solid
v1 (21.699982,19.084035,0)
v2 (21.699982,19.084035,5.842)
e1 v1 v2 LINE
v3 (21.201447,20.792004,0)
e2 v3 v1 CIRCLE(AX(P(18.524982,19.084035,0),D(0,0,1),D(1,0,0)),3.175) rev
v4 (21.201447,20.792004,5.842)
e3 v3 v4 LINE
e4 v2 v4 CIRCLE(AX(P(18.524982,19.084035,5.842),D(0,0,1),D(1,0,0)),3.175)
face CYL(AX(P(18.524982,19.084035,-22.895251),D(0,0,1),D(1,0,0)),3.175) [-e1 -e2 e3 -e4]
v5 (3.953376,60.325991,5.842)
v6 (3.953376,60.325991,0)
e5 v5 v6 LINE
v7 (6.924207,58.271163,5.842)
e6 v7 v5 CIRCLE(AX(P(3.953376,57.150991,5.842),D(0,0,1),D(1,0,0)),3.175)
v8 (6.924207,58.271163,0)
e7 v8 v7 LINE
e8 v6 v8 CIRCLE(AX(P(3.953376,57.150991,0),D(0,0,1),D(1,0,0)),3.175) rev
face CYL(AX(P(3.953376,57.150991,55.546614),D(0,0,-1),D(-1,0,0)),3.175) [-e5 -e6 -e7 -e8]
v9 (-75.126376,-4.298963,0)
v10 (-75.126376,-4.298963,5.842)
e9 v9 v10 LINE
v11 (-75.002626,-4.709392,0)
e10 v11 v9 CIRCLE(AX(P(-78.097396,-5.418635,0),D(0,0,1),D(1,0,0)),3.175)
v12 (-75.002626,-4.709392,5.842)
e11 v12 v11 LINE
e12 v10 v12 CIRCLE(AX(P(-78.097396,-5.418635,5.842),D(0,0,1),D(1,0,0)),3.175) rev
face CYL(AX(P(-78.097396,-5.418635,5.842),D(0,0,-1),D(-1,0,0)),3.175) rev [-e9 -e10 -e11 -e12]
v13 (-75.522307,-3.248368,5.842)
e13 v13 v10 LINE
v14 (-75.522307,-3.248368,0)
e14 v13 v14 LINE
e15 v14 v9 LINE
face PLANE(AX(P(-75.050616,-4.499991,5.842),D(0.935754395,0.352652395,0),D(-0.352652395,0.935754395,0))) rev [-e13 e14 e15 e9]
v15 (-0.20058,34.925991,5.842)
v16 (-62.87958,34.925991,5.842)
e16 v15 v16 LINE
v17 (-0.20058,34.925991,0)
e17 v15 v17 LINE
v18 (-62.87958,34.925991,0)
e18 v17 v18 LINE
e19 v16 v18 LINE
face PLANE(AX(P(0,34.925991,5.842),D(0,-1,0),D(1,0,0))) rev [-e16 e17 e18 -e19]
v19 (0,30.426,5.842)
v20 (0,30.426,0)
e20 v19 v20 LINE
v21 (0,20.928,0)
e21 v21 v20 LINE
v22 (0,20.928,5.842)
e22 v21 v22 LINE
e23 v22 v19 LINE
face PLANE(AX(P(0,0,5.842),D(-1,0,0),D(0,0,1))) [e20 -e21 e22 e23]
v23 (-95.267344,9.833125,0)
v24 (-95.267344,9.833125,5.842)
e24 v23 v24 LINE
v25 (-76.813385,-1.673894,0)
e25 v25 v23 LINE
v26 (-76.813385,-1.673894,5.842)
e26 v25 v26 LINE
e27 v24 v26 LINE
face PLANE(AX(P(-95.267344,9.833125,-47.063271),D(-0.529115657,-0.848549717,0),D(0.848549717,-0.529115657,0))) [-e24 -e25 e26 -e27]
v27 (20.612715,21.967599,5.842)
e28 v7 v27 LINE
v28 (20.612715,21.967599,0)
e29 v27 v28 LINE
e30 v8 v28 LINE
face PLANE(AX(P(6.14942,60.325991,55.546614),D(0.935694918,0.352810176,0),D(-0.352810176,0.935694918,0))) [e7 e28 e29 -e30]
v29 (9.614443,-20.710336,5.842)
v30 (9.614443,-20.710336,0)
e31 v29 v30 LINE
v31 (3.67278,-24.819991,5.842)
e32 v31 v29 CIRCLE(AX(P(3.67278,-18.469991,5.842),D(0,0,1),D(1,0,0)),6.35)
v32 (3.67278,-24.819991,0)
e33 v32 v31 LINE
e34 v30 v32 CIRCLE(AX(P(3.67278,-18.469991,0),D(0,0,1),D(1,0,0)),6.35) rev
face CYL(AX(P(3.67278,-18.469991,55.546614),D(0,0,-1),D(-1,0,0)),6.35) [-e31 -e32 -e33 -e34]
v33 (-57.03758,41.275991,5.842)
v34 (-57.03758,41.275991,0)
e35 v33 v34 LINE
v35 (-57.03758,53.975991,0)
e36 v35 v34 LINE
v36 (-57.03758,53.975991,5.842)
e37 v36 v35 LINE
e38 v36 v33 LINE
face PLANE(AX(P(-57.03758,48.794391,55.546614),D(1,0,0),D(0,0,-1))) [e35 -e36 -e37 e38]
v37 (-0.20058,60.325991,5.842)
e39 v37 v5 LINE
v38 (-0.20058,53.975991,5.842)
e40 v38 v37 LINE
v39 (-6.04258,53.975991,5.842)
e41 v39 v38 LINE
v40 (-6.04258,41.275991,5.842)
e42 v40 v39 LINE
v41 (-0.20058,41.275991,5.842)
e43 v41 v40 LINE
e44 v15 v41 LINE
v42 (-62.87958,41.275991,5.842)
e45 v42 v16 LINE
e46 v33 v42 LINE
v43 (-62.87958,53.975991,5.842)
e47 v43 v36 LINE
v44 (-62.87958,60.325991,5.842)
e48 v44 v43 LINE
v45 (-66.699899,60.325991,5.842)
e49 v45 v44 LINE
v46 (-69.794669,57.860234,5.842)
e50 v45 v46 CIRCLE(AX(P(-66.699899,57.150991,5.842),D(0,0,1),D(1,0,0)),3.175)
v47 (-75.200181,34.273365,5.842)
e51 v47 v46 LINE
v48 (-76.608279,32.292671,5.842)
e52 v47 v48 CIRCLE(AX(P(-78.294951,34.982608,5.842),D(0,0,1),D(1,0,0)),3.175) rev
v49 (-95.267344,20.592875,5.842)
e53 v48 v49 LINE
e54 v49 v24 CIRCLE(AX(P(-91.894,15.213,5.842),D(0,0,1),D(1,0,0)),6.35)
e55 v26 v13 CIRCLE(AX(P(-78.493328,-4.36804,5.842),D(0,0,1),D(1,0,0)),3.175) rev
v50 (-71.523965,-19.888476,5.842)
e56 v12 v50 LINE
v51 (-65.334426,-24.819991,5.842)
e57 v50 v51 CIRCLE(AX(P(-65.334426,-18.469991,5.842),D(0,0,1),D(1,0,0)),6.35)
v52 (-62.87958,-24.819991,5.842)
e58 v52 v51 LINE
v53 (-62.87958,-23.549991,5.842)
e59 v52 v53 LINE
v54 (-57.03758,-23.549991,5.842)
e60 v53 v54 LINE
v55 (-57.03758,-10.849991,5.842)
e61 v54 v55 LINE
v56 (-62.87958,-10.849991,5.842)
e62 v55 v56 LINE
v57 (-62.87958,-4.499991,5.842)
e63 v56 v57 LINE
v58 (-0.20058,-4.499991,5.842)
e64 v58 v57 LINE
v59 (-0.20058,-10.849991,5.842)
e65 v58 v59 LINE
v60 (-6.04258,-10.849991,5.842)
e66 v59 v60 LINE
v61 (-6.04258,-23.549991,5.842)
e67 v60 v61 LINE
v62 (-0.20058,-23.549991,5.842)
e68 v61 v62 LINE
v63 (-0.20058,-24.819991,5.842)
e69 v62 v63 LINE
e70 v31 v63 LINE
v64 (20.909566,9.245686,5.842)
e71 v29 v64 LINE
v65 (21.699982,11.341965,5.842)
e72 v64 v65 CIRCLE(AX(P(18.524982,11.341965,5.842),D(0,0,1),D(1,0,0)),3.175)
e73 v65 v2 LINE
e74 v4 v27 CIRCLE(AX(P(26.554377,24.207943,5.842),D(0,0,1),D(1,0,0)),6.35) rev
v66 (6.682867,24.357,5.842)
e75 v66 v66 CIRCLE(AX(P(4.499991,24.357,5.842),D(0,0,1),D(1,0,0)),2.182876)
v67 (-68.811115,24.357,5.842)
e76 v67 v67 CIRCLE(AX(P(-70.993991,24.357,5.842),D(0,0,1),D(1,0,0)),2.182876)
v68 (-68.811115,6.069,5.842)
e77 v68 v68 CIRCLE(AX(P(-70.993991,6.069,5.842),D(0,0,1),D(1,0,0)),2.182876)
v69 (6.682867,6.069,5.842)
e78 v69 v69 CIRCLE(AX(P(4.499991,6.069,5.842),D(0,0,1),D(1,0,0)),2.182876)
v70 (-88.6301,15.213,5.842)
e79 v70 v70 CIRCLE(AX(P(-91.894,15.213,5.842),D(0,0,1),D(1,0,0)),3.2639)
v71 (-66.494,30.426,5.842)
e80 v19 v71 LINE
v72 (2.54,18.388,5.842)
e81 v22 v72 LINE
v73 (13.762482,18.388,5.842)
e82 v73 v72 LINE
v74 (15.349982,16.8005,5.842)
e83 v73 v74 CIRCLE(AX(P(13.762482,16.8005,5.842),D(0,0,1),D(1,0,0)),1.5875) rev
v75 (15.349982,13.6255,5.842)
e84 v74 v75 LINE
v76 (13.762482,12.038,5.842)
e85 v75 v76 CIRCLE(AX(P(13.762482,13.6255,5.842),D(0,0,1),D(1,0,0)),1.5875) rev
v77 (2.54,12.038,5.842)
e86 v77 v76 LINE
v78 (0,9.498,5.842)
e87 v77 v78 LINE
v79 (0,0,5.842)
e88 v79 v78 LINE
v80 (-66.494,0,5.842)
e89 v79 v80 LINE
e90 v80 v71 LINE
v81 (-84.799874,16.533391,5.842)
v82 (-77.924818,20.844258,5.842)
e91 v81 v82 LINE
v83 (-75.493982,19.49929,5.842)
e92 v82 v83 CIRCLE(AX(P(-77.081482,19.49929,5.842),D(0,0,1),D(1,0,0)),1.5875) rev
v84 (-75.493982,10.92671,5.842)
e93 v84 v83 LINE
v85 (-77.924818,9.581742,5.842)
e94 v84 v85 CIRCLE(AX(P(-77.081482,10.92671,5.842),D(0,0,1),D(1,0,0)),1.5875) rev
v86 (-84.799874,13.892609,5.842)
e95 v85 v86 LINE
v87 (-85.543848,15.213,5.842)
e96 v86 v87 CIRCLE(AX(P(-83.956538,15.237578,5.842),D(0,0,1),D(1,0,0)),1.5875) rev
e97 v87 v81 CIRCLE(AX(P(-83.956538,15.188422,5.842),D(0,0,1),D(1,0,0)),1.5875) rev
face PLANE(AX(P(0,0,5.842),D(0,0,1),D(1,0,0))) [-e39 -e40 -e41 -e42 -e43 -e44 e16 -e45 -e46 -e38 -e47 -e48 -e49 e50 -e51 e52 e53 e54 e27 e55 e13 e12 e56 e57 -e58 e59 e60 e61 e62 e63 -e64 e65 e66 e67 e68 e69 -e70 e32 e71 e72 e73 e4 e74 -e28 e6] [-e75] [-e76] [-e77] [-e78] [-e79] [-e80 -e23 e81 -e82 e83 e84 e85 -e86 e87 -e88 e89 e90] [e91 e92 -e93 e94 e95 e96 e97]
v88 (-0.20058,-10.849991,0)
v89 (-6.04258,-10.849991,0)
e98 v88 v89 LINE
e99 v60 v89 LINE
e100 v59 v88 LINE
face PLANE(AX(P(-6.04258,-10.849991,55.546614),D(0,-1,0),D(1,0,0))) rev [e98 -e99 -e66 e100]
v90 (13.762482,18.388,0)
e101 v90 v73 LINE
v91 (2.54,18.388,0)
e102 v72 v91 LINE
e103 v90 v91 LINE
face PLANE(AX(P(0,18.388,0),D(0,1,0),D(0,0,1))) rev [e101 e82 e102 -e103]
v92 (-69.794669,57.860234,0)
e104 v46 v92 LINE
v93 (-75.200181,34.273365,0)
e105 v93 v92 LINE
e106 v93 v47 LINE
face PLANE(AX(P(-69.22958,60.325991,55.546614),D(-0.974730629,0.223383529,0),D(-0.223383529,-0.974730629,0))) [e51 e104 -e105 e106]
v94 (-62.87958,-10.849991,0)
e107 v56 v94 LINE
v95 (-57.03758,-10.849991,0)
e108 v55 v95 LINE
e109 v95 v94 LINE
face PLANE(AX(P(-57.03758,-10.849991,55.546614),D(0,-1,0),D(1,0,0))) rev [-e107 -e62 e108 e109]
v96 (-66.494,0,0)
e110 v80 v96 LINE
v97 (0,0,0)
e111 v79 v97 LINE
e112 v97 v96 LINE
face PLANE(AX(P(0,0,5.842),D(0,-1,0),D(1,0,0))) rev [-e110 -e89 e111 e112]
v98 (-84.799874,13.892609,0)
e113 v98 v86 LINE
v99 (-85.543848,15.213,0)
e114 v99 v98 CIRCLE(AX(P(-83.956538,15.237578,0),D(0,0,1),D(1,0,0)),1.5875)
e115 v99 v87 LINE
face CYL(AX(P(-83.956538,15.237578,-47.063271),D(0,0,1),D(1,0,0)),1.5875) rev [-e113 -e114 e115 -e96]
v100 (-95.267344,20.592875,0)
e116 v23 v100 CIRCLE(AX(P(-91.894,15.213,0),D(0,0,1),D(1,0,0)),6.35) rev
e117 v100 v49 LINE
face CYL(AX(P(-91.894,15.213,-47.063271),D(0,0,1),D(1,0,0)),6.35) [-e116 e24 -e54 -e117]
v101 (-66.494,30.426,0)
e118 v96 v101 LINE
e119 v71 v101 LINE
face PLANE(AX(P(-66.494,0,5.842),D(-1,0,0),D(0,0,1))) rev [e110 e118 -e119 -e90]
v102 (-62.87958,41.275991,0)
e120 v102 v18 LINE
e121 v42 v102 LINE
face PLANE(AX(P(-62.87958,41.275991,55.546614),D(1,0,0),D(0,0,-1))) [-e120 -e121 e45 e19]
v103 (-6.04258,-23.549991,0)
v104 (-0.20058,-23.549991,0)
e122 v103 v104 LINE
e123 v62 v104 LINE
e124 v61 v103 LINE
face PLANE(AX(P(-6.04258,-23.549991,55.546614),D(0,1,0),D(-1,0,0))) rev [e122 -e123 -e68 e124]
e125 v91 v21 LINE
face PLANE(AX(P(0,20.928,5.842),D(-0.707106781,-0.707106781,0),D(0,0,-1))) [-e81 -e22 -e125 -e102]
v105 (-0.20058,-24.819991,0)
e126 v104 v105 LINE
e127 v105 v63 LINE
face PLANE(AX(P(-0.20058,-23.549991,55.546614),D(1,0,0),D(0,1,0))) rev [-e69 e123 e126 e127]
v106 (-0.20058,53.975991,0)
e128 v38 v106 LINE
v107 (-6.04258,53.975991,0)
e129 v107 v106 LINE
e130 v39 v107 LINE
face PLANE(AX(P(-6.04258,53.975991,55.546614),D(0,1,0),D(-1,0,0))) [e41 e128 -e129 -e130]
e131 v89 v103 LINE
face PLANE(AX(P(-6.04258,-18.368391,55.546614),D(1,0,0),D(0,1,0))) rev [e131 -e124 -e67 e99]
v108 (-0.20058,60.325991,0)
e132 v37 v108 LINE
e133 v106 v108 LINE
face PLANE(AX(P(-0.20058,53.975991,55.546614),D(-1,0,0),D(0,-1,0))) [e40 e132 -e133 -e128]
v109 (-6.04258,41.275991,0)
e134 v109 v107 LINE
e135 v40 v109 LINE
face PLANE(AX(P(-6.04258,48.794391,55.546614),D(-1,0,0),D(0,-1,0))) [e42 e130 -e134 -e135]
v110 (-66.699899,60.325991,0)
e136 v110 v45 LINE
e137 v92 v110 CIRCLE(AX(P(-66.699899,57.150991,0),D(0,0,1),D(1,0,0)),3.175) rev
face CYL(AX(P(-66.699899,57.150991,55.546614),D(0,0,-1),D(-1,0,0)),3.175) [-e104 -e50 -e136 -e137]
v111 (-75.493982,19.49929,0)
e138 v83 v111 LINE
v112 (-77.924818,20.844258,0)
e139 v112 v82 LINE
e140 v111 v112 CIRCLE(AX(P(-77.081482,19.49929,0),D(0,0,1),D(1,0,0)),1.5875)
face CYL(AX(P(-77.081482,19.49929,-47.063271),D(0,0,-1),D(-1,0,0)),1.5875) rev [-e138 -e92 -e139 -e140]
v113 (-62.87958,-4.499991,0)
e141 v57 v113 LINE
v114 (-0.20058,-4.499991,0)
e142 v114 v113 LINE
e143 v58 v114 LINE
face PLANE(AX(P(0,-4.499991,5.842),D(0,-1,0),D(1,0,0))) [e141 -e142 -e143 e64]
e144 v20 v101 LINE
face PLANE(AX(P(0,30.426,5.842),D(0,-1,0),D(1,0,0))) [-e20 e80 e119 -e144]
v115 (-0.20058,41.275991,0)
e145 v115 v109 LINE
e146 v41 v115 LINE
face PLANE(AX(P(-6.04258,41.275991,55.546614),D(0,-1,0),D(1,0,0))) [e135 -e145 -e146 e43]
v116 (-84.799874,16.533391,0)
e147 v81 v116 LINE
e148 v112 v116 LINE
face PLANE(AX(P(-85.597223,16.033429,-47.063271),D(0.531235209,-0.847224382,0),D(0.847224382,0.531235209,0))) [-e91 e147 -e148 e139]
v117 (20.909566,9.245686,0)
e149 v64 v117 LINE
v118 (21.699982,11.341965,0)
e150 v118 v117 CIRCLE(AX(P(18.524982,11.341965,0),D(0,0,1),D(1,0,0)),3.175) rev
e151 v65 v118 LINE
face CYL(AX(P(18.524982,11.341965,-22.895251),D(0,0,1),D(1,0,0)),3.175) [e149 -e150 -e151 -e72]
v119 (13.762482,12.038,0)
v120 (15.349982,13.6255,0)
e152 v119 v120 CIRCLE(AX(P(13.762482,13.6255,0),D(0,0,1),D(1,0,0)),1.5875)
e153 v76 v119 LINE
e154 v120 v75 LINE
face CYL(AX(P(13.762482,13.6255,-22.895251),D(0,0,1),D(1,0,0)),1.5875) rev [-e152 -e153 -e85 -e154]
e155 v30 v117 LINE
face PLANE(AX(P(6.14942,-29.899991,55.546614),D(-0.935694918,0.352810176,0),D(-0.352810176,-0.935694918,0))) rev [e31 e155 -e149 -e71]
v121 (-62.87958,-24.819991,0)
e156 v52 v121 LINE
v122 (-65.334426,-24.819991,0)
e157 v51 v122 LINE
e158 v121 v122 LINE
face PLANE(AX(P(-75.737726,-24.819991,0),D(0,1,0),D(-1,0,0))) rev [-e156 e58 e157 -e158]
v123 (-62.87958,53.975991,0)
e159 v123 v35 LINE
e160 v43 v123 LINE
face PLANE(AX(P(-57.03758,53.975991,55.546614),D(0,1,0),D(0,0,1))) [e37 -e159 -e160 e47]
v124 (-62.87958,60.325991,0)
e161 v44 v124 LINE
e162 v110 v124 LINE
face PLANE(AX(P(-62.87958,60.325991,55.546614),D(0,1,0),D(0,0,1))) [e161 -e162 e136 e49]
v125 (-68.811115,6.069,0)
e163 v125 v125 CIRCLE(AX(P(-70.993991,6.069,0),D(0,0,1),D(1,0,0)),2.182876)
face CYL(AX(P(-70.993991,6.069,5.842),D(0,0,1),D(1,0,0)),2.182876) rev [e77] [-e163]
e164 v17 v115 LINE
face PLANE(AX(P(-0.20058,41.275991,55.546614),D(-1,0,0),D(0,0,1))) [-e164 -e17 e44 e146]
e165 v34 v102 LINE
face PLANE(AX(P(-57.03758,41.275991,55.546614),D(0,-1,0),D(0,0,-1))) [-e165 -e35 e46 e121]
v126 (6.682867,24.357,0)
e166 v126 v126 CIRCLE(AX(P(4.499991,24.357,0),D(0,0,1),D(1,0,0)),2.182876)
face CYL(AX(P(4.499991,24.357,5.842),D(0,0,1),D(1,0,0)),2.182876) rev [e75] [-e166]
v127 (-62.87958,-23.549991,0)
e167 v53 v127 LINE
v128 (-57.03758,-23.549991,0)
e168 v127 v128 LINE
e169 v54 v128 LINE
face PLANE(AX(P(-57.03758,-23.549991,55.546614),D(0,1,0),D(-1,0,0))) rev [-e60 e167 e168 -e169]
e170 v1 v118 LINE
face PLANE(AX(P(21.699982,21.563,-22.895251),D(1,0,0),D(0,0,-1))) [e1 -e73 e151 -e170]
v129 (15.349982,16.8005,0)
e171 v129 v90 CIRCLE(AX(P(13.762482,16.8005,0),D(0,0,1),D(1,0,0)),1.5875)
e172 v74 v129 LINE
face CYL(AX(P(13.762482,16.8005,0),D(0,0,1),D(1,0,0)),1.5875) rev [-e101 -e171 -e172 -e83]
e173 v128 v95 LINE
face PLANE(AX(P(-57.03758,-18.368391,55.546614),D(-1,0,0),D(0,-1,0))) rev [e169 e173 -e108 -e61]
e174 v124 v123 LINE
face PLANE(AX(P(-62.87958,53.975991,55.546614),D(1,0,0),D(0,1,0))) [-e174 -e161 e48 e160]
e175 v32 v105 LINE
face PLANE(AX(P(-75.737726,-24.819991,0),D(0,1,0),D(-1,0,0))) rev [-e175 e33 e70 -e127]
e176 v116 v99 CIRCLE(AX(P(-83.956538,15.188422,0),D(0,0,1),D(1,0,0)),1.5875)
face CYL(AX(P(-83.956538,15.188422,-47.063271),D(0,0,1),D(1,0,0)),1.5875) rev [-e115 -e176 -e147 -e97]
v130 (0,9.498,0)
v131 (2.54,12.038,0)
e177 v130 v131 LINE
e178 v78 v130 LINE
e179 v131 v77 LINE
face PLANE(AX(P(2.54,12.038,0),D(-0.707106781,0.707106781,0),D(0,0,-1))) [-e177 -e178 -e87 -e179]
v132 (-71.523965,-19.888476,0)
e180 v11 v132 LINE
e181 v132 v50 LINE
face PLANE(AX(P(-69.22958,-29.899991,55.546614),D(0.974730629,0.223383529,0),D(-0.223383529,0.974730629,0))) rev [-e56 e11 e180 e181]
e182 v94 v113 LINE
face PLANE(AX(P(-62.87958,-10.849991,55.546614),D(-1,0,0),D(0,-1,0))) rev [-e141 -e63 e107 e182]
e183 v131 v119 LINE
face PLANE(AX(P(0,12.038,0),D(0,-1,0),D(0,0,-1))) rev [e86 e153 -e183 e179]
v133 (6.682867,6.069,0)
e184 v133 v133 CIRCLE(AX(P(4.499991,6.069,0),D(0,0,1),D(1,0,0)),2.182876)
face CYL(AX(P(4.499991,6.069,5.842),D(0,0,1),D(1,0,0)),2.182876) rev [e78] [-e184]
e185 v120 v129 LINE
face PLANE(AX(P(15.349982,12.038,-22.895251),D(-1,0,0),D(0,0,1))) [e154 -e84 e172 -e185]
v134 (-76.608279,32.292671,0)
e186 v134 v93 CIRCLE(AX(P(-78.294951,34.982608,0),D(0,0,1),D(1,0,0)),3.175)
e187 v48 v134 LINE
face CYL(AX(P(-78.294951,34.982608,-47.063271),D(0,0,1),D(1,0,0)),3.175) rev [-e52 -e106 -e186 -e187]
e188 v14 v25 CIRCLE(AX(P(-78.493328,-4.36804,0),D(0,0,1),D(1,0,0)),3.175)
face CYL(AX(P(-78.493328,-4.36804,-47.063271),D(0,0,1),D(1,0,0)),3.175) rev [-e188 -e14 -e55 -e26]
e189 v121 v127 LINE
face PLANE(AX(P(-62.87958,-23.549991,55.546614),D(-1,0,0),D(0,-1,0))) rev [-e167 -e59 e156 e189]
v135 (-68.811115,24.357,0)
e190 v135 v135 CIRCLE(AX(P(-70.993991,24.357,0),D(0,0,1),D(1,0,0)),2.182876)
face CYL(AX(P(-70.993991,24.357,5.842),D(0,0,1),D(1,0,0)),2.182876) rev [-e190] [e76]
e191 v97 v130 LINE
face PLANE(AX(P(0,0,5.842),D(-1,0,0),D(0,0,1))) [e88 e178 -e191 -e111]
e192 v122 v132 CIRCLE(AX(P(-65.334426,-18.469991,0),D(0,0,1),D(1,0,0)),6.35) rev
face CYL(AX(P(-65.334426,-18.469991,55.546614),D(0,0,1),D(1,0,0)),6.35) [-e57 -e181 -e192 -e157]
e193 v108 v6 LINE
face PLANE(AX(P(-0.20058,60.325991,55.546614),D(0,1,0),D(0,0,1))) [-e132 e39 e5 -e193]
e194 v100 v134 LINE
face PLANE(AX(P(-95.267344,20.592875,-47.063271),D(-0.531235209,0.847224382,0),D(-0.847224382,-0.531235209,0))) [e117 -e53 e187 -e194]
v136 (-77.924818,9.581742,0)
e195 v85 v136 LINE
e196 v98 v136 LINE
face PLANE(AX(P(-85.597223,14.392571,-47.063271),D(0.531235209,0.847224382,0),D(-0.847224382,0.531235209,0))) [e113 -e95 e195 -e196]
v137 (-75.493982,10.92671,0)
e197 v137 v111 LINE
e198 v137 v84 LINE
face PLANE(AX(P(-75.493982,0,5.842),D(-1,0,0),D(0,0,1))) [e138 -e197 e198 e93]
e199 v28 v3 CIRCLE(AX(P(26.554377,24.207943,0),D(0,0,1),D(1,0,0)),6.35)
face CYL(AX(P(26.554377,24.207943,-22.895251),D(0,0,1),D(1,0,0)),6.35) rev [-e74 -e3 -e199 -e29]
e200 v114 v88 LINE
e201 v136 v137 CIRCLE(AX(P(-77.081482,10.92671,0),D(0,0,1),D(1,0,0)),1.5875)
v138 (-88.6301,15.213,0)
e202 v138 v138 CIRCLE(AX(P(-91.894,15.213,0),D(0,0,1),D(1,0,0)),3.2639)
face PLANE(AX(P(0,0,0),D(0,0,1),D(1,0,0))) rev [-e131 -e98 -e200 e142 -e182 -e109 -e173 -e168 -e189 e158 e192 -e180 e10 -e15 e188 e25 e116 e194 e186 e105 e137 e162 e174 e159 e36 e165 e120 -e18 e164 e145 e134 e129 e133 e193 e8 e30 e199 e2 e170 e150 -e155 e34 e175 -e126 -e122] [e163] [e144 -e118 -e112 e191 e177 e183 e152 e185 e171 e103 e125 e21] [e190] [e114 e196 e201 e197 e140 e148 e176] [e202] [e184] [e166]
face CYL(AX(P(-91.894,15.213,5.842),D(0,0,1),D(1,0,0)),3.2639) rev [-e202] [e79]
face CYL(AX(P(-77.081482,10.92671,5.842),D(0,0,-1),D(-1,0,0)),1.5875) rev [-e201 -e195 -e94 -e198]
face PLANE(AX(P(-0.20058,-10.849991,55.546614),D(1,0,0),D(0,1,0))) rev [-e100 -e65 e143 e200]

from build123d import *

# Parameters (mm, degrees)
SKETCH1_W                        = 66.494000054
SKETCH1_H                        = 30.426
BOSS_EXTRUDE1_DEPTH              = 5.842
F_11_64_0_17188_DIAMETER_HOLE1_D = 4.365752
F_0_257_DIAMETER_HOLE1_D         = 6.5278
BOSS_EXTRUDE3_DEPTH              = 5.842
F_0_257_DIAMETER_HOLE3_D         = 6.5278
SKETCH13_W                       = 8.999982
SKETCH13_H                       = 6.35
CUT_EXTRUDE1_DEPTH               = 105.431017222
CHAMFER1_SIZE                    = 2.54
BOSS_EXTRUDE6_DEPTH              = 5.842
FILLET1_R                        = 3.175
FILLET2_R                        = 1.5875
FILLET3_R                        = 1.5875
BOSS_EXTRUDE7_DEPTH              = 5.842
FILLET4_R                        = 3.175
FILLET5_R                        = 6.35
FILLET6_R                        = 3.175
CUT_EXTRUDE3_DEPTH               = 116.434993398
CUT_EXTRUDE4_DEPTH               = 116.434993398
FILLET10_R                       = 3.175
SKETCH29_W                       = 87.204685613
SKETCH29_H                       = 5.08
CUT_EXTRUDE6_DEPTH               = 116.434993398
FILLET12_R                       = 6.35


with BuildPart() as part:
    # Sketch1 → Boss-Extrude1 (new body)
    with BuildSketch(Plane.XY):
        with BuildLine():
            Line((-75.493982054, 0), (-75.493982054, 30.426))
            ThreePointArc((-75.493982054, 30.426), (-74.175965205, 33.607974151), (-70.993991054, 34.925991))
            Line((-70.993991054, 34.925991), (4.499991, 34.925991))
            ThreePointArc((4.499991, 34.925991), (7.681965151, 33.607974151), (8.999982, 30.426))
            Line((8.999982, 30.426), (8.999982, 0))
            Line((8.999982, 0), (11.100760908, -11.565106481))
            ThreePointArc((11.100760908, -11.565106481), (7.160083484, -18.61606843), (-0.513638035, -16.094362457))
            Line((-0.513638035, -16.094362457), (-7.847000027, -4.499991))
            Line((-7.847000027, -4.499991), (-58.647000027, -4.499991))
            Line((-58.647000027, -4.499991), (-65.980362019, -16.094362457))
            ThreePointArc((-65.980362019, -16.094362457), (-73.654083538, -18.61606843), (-77.594760962, -11.565106481))
            Line((-77.594760962, -11.565106481), (-75.493982054, 0))
        make_face()
        with Locations((-33.247000027, 15.213)):
            Rectangle(SKETCH1_W, SKETCH1_H, mode=Mode.SUBTRACT)
    extrude(amount=BOSS_EXTRUDE1_DEPTH)

    # 11/64 (0.17188) Diameter Hole1 (through all)
    with Locations(Plane.XY.offset(5.842)):
        with Locations((-70.993991054, 24.357), (-70.993991054, 6.069)):
            f_11_64_0_17188_diameter_hole1 = Hole(F_11_64_0_17188_DIAMETER_HOLE1_D / 2)

    # Mirror1: 11/64 (0.17188) Diameter Hole1 across plane
    add(f_11_64_0_17188_diameter_hole1.mirror(Plane.ZY.offset(33.247000027)), mode=Mode.SUBTRACT)

    # F (0.257) Diameter Hole1 (through all)
    with Locations(Plane.XY.offset(5.842)):
        with Locations((-71.347000027, -12.7)):
            f_0_257_diameter_hole1 = Hole(F_0_257_DIAMETER_HOLE1_D / 2)

    # Mirror2: F (0.257) Diameter Hole1 across plane
    add(f_0_257_diameter_hole1.mirror(Plane.ZY.offset(33.247000027)), mode=Mode.SUBTRACT)

    # Sketch10 → Boss-Extrude3 (add)
    with BuildSketch(Plane.XY.offset(5.842)):
        with BuildLine():
            Line((-95.26734363, 20.592874824), (-73.384544712, 34.314048933))
            Line((-73.384544712, 34.314048933), (-68.603437396, 34.314048933))
            Line((-68.603437396, 34.314048933), (-75.493982054, 30.426))
            Line((-75.493982054, 30.426), (-75.493982054, 22.368465679))
            Line((-75.493982054, 22.368465679), (-85.597223399, 16.03342901))
            ThreePointArc((-85.597223399, 16.03342901), (-85.544000054, 15.213), (-85.597223399, 14.39257099))
            Line((-85.597223399, 14.39257099), (-75.493982054, 8.057534321))
            Line((-75.493982054, 8.057534321), (-75.493982054, 0))
            Line((-75.493982054, 0), (-75.901345831, -2.242599371))
            Line((-75.901345831, -2.242599371), (-95.26734363, 9.833125176))
            ThreePointArc((-95.26734363, 9.833125176), (-98.244000054, 15.213), (-95.26734363, 20.592874824))
        make_face()
    extrude(amount=-BOSS_EXTRUDE3_DEPTH)

    # F (0.257) Diameter Hole3 (through all)
    with Locations(Plane.XY.offset(5.842)):
        with Locations((-91.894000054, 15.213)):
            Hole(F_0_257_DIAMETER_HOLE3_D / 2)

    # Sketch13 → Cut-Extrude1 (cut, through all)
    with BuildSketch(Plane.XY.offset(5.842)):
        with Locations((4.499991, 15.213)):
            Rectangle(SKETCH13_W, SKETCH13_H)
    extrude(amount=-CUT_EXTRUDE1_DEPTH, mode=Mode.SUBTRACT)

    # Chamfer1
    chamfer1_edges = [part.edges().sort_by_distance(p)[0] for p in [
        (0, 12.038, 2.921),
        (0, 18.388, 2.921),
    ]]
    chamfer(chamfer1_edges, length=CHAMFER1_SIZE)

    # Sketch22 → Boss-Extrude6 (add)
    with BuildSketch(Plane.XY.offset(5.842)):
        Polygon((8.999982, 18.388), (8.999982, 24.738), (21.699982, 21.563), (21.699982, 8.863), (8.999982, 5.688), (8.999982, 12.038), (15.349982, 12.038), (15.349982, 18.388), align=None)
    extrude(amount=-BOSS_EXTRUDE6_DEPTH)

    # Fillet1
    fillet1_edges = [part.edges().sort_by_distance(p)[0] for p in [
        (8.999982, 24.738, 2.921),
        (21.699982, 21.563, 2.921),
        (21.699982, 8.863, 2.921),
        (8.999982, 5.688, 2.921),
    ]]
    fillet(fillet1_edges, radius=FILLET1_R)

    # Fillet2
    fillet2_edges = [part.edges().sort_by_distance(p)[0] for p in [
        (15.349982, 18.388, 2.921),
        (15.349982, 12.038, 2.921),
    ]]
    fillet(fillet2_edges, radius=FILLET2_R)

    # Fillet3
    # the kernel refuses this fillet: 1.5875 mm, written as the material it adds along each edge
    with BuildSketch(Plane(origin=(-75.493982054, 8.057534321, 5.842), x_dir=(0, 1, 0), z_dir=(0, 0, -1))) as fillet3_piece_1:
        with BuildLine():
            CenterArc((FILLET3_R * 1.80735498388, -FILLET3_R), FILLET3_R, 90, 122.088950954)
            Line((FILLET3_R * 0.960130602163, -FILLET3_R * 1.53123520876), (0, 0))
            Line((0, 0), (FILLET3_R * 1.80735498388, 0))
        make_face()
    extrude(amount=5.842)
    with BuildSketch(Plane(origin=(-75.493982054, 22.368465679, 5.842), x_dir=(0, -1, 0), z_dir=(0, 0, -1))) as fillet3_piece_2:
        with BuildLine():
            CenterArc((FILLET3_R * 1.80735498388, FILLET3_R), FILLET3_R, 147.911049046, 122.088950954)
            Line((FILLET3_R * 0.960130602163, FILLET3_R * 1.53123520876), (0, 0))
            Line((0, 0), (FILLET3_R * 1.80735498388, 0))
        make_face()
    extrude(amount=5.842)
    with BuildSketch(Plane(origin=(-85.597223399, 14.39257099, 5.842), x_dir=(0.06319147380474219, 0.9980014216615047, 0), z_dir=(0, 0, -1))) as fillet3_piece_3:
        with BuildLine():
            CenterArc((0.946995123, 1.584009043), FILLET3_R, 208.465932253, 57.73363863)
            Line((-0.448577196, 0.827349177), (0, 0))
            ThreePointArc((0, 0), (0.420886721, 0.013963828), (0.841773443, 0))
        make_face()
    extrude(amount=5.842)
    with BuildSketch(Plane(origin=(-85.597223399, 16.03342901, 5.842), x_dir=(0.8472243817163825, 0.5312352087590706, 0), z_dir=(0, 0, -1))) as fillet3_piece_4:
        with BuildLine():
            CenterArc((0.94113132, 1.5875), FILLET3_R, 212.26636137, 57.73363863)
            ThreePointArc((-0.401219641, 0.7400036), (-0.18833421, 0.376657465), (0, 0))
            Line((0, 0), (0.94113132, 0))
        make_face()
    extrude(amount=5.842)

    # Sketch24 → Boss-Extrude7 (add)
    with BuildSketch(Plane(origin=(0, 0, 0), x_dir=(-1, 0, 0), z_dir=(0, 0, -1))):
        Polygon((57.037580054, 48.794391), (57.037580054, 41.275991), (62.879580054, 41.275991), (62.879580054, 34.925991), (70.993991054, 34.925991), (73.259602339, 34.314048933), (73.384544712, 34.314048933), (75.493982054, 32.991368176), (69.229580054, 60.325991), (62.879580054, 60.325991), (62.879580054, 53.975991), (57.037580054, 53.975991), align=None)
        Polygon((0.200579946, 60.325991), (-6.149420054, 60.325991), (-21.699982, 19.08403491), (-9.699273994, 22.99974755), (0.200579946, 34.925991), (0.200579946, 41.275991), (6.042579946, 41.275991), (6.042579946, 48.794391), (6.042579946, 53.975991), (0.200579946, 53.975991), align=None)
    boss_extrude7 = extrude(amount=-BOSS_EXTRUDE7_DEPTH)

    # Fillet4
    fillet4_edges = [part.edges().sort_by_distance(p)[0] for p in [
        (-75.493982054, 32.991368176, 2.921),
        (-69.229580054, 60.325991, 2.921),
    ]]
    fillet(fillet4_edges, radius=FILLET4_R)

    # Fillet5
    fillet5_edges = [part.edges().sort_by_distance(p)[0] for p in [
        (20.909565621, 21.180313983, 2.921),
    ]]
    fillet(fillet5_edges, radius=FILLET5_R)

    # Fillet6
    fillet6_edges = [part.edges().sort_by_distance(p)[0] for p in [
        (6.149420054, 60.325991, 2.921),
    ]]
    fillet(fillet6_edges, radius=FILLET6_R)

    # Sketch26 → Cut-Extrude3 (cut, through all)
    with BuildSketch(Plane(origin=(0, 0, 0), x_dir=(-1, 0, 0), z_dir=(0, 0, -1))):
        Polygon((89.149059257, -30.603913947), (-16.445159676, -30.603913947), (-16.445159676, -4.499991), (-16.445159676, 1.604517455), (-8.999982, 1.604517455), (-8.999982, -4.499991), (75.901345831, -4.499991), (75.901345831, -2.242599371), (89.149059257, -2.242599371), (89.149059257, -4.499991), align=None)
    extrude(amount=-CUT_EXTRUDE3_DEPTH, mode=Mode.SUBTRACT)

    # Mirror3: Boss-Extrude7 across plane
    add(boss_extrude7.mirror(Plane(origin=(0, 15.213, 0), x_dir=(0, 0, 1), z_dir=(0, -1, 0))))

    # Sketch28 → Cut-Extrude4 (cut, through all)
    with BuildSketch(Plane(origin=(0, 0, 0), x_dir=(-1, 0, 0), z_dir=(0, 0, -1))):
        Polygon((75.050615589, -4.499991), (75.901345831, -2.242599371), (75.901345831, -4.499991), align=None)
    extrude(amount=-CUT_EXTRUDE4_DEPTH, mode=Mode.SUBTRACT)

    # Fillet10
    fillet10_edges = [part.edges().sort_by_distance(p)[0] for p in [
        (6.149420054, -29.899991, 2.921),
        (-75.050615589, -4.499991, 2.921),
        (-69.229580054, -29.899991, 2.921),
        (-75.901345831, -2.242599371, 2.921),
    ]]
    fillet(fillet10_edges, radius=FILLET10_R)

    # Sketch29 → Cut-Extrude6 (cut, through all)
    with BuildSketch(Plane.XY.offset(5.842)):
        with Locations((-32.135383003, -27.359991)):
            Rectangle(SKETCH29_W, SKETCH29_H)
    extrude(amount=-CUT_EXTRUDE6_DEPTH, mode=Mode.SUBTRACT)

    # Fillet12
    fillet12_edges = [part.edges().sort_by_distance(p)[0] for p in [
        (8.064868839, -24.819991, 2.921),
        (-70.393787161, -24.819991, 2.921),
    ]]
    fillet(fillet12_edges, radius=FILLET12_R)


solid = part.part
